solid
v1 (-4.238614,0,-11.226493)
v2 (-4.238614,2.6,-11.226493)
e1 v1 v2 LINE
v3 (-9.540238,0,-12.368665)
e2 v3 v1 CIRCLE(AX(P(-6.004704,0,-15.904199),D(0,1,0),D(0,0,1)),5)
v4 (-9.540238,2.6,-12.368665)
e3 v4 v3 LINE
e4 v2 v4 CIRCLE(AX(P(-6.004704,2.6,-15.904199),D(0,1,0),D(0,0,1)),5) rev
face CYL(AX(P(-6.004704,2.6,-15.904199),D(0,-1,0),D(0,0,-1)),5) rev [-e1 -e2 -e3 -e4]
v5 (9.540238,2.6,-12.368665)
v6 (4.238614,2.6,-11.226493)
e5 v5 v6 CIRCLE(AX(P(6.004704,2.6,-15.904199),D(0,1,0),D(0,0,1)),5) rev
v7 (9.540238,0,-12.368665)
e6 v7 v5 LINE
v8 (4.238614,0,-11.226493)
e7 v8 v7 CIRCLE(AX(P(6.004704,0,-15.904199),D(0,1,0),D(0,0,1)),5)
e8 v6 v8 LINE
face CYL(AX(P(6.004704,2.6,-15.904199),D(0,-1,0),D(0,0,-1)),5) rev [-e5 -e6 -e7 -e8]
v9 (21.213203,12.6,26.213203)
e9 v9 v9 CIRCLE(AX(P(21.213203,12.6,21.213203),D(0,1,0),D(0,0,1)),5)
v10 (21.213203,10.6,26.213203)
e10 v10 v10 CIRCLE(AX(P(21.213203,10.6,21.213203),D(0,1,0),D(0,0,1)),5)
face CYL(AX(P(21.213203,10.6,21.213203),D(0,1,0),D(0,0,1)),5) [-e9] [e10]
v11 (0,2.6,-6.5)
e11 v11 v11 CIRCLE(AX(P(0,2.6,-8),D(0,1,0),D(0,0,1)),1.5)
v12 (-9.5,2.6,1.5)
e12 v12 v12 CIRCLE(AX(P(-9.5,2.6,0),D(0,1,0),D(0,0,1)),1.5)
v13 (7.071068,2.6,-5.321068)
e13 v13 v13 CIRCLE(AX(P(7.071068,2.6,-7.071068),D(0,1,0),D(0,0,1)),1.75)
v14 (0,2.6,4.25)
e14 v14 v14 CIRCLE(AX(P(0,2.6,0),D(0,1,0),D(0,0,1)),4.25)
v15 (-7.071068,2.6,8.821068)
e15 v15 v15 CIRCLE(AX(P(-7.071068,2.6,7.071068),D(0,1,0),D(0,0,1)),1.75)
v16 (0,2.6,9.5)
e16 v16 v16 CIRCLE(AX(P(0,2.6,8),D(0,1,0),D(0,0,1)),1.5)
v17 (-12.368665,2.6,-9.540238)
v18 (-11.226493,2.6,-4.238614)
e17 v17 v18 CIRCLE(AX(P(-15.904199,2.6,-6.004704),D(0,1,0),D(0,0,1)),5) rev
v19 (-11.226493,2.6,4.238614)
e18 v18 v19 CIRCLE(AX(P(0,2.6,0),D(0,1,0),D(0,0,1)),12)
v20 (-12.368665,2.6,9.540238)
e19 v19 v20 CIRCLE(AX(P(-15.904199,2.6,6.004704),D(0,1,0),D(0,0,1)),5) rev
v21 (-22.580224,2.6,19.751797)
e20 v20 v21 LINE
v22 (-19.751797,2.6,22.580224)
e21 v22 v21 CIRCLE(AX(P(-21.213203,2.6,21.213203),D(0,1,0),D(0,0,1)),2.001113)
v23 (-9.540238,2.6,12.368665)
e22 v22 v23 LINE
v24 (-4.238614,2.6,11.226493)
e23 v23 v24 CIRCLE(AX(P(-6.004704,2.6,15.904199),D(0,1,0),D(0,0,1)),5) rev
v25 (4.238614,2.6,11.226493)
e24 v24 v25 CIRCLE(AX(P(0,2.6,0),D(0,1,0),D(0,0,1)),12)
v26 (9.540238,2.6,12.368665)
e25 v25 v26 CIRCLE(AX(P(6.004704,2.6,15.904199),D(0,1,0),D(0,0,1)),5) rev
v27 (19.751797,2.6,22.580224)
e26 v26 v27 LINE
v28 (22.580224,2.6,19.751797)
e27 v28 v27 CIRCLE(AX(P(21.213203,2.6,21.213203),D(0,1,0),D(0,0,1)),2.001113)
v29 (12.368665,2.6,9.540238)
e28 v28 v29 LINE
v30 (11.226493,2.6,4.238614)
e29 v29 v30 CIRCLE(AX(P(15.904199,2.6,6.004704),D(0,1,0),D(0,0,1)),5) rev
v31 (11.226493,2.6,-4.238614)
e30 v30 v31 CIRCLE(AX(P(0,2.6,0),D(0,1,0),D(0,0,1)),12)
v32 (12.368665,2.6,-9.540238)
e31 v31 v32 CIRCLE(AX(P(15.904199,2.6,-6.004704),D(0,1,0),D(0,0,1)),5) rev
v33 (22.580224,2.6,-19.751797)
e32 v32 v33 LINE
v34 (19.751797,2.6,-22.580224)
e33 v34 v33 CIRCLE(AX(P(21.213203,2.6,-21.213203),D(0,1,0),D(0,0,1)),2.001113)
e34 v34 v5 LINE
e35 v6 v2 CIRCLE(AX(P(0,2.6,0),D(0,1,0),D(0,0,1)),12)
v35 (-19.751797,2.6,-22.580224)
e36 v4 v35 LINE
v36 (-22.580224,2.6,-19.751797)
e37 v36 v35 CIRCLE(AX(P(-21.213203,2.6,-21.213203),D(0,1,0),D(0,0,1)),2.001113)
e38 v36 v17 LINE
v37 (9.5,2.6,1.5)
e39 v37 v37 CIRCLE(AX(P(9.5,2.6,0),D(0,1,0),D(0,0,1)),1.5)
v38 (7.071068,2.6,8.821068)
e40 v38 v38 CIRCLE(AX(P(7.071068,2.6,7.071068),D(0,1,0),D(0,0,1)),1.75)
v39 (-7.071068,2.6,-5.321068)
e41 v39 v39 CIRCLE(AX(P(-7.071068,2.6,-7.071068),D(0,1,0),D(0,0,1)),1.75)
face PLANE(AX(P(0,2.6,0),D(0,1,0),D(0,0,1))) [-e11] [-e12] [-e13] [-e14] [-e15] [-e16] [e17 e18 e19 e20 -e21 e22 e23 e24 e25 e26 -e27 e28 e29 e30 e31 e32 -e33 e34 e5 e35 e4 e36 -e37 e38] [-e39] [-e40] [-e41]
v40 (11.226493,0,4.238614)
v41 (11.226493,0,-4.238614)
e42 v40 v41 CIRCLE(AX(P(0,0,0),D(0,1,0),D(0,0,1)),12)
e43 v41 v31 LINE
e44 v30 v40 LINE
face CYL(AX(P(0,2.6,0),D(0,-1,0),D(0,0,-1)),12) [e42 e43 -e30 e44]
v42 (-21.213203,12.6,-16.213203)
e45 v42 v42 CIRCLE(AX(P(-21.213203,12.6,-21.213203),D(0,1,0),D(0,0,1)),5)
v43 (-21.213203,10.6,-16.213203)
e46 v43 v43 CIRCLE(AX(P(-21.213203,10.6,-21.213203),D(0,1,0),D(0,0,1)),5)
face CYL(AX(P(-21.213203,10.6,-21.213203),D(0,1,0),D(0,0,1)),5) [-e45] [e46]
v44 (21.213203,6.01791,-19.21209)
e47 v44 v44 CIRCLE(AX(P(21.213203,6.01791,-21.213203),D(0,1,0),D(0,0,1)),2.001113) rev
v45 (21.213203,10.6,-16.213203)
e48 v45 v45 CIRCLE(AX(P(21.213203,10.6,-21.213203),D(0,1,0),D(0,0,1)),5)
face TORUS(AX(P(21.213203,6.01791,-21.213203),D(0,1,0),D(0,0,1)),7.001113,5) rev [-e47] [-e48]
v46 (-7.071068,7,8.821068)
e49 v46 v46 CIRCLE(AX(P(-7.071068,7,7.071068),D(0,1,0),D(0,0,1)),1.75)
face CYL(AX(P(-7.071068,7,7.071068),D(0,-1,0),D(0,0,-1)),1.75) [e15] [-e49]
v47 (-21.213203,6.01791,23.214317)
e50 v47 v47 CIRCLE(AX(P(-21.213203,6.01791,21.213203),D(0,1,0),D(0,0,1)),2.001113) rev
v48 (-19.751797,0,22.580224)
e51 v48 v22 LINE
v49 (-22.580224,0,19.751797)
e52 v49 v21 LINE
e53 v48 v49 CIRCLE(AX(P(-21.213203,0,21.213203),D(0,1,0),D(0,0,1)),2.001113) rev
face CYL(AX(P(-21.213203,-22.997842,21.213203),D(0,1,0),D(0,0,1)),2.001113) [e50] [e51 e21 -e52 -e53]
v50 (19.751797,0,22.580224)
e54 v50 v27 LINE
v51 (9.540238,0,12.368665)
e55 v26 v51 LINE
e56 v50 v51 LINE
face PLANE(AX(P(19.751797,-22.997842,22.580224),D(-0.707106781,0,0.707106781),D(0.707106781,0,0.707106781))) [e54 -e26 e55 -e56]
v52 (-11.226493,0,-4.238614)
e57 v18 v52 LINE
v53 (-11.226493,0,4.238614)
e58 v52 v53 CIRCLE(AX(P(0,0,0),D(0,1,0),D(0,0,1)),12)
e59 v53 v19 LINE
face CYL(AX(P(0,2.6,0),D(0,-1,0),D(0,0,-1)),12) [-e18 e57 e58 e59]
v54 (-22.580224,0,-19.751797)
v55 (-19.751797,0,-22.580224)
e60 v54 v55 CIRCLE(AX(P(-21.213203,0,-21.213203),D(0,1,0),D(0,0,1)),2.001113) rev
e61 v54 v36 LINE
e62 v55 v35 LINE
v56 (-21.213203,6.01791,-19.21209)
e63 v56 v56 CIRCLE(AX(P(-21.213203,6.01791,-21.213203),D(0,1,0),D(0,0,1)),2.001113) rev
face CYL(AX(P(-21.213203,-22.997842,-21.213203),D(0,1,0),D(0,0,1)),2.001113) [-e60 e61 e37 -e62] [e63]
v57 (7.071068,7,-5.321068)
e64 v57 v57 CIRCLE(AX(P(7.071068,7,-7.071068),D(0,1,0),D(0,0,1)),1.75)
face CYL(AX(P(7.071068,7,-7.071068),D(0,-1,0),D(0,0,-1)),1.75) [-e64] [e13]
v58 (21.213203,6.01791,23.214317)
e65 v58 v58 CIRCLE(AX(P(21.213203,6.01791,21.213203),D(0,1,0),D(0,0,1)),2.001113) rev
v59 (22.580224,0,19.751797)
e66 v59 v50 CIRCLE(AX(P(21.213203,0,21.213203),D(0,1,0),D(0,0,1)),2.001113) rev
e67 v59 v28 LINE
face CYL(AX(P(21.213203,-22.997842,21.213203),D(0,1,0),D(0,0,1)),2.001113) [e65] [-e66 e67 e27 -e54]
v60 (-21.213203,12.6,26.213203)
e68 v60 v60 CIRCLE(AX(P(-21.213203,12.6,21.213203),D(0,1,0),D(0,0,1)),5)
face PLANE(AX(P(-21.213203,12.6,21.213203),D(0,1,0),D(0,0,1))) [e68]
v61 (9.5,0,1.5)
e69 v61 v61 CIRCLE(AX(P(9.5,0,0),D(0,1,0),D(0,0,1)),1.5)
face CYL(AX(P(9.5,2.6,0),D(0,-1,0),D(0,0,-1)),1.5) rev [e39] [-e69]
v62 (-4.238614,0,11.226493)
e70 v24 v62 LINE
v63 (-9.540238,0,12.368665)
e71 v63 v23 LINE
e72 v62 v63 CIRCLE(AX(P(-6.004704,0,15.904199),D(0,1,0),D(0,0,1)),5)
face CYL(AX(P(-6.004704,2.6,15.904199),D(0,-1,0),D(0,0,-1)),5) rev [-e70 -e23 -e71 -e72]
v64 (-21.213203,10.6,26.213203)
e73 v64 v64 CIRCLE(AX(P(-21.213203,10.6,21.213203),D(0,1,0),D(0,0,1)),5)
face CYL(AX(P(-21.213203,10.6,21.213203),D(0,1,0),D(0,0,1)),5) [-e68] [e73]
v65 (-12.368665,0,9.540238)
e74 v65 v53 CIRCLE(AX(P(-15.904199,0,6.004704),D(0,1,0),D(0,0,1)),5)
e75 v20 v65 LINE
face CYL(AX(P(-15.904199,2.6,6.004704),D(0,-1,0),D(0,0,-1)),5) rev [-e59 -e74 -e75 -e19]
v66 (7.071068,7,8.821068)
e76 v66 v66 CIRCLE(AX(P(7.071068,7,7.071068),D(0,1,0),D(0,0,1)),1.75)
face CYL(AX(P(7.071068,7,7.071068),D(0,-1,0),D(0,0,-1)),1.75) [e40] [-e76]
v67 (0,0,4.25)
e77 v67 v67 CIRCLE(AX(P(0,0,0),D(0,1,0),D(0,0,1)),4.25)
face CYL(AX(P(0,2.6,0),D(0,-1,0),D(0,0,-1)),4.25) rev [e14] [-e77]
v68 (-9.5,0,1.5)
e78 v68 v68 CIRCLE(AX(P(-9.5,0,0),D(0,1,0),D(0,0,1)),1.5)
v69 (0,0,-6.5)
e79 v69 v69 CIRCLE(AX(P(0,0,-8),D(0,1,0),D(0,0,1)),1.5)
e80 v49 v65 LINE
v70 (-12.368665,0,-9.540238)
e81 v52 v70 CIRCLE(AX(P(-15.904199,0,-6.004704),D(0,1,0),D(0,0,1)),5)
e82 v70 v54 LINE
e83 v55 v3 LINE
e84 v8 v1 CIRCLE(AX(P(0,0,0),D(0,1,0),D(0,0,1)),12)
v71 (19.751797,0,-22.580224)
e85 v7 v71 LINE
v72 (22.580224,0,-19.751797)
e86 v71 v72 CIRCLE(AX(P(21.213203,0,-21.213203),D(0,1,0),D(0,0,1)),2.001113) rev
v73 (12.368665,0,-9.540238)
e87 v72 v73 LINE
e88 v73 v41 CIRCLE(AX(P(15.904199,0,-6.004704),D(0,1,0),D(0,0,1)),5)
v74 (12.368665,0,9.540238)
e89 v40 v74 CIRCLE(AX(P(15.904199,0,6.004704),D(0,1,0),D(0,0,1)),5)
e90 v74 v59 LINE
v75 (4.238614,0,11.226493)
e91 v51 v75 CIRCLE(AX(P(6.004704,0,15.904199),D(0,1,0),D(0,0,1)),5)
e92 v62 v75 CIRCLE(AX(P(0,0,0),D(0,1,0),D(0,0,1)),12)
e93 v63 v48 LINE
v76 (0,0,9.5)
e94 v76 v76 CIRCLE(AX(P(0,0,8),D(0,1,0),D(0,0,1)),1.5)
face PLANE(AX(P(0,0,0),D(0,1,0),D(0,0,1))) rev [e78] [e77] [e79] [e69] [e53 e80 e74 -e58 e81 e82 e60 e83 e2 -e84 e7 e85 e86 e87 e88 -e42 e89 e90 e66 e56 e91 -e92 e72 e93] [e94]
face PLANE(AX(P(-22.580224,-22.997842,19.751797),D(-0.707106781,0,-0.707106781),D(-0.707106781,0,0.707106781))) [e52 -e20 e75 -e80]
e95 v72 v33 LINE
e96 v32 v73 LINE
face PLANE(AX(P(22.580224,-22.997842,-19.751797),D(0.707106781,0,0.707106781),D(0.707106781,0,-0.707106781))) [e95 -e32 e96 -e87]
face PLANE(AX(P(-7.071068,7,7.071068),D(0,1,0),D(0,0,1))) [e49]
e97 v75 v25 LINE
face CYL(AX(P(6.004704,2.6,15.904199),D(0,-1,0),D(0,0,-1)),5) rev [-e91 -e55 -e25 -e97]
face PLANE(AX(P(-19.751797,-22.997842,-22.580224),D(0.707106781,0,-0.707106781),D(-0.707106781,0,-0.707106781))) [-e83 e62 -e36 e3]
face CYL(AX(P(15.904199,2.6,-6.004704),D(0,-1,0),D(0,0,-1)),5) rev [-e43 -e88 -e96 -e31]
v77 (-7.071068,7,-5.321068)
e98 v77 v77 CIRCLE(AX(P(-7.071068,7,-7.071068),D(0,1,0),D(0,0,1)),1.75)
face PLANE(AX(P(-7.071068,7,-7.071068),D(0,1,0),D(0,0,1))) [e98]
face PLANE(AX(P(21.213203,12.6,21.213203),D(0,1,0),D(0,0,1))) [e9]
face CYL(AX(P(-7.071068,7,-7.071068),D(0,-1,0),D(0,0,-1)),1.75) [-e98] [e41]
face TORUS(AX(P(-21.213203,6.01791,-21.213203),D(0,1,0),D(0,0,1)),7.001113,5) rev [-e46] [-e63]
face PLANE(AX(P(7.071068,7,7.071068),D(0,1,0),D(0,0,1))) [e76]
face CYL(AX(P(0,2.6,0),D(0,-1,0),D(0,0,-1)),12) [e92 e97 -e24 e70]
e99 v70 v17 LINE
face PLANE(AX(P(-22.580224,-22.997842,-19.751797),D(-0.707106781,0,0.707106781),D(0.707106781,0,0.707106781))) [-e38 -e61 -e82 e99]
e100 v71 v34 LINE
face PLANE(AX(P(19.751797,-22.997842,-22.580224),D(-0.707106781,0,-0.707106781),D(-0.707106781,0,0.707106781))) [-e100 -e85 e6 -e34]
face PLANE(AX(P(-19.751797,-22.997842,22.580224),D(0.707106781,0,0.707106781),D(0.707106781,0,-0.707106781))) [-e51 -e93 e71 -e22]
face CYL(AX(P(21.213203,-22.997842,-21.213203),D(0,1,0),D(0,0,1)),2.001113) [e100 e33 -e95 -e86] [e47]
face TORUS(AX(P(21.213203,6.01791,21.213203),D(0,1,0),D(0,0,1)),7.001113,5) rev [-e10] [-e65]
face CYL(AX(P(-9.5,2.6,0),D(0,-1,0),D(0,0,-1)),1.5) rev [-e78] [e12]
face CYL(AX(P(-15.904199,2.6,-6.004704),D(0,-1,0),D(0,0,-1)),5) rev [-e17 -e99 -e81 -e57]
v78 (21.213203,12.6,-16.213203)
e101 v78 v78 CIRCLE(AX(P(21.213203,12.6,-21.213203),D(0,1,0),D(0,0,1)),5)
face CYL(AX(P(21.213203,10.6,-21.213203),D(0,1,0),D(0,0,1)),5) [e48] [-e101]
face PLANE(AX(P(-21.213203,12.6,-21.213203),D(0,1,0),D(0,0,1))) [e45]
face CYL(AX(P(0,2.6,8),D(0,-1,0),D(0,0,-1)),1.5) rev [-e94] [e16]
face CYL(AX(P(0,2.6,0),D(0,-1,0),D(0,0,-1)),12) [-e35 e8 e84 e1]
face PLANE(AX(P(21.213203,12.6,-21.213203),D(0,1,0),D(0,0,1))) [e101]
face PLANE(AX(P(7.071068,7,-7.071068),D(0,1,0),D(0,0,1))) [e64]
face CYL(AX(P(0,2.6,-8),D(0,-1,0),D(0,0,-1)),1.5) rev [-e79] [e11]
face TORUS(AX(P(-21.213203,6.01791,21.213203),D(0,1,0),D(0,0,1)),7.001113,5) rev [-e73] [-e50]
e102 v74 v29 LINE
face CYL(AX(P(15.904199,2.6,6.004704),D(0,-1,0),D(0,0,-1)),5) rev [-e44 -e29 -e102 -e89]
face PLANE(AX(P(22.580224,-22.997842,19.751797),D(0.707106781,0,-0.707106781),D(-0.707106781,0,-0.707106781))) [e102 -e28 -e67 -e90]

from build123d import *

# Parameters (mm, degrees)
SKETCH1_R           = 12
SKETCH1_R_2         = 1.5
SKETCH1_R_3         = 4.25
BOSS_EXTRUDE1_DEPTH = 2.6
SKETCH2_R           = 1.75
BOSS_EXTRUDE2_DEPTH = 4.4
BOSS_EXTRUDE3_DEPTH = 2.6
BOSS_EXTRUDE4_START = 10
SKETCH5_R           = 2.001113277
BOSS_EXTRUDE4_DEPTH = 10
SKETCH6_R           = 5
BOSS_EXTRUDE5_DEPTH = 2
FILLET1_R           = 5


with BuildPart() as part:
    # Sketch1 → Boss-Extrude1 (new body)
    with BuildSketch(Plane(origin=(0, 0, 0), x_dir=(1, 0, 0), z_dir=(0, 1, 0))):
        with Locations(Location((0, 0, 0), (0, 0, 270))):
            Circle(SKETCH1_R)
        with Locations(Location((0, 8, 0), (0, 0, 270))):
            Circle(SKETCH1_R_2, mode=Mode.SUBTRACT)
        with Locations(Location((9.5, 0, 0), (0, 0, 270))):
            Circle(SKETCH1_R_2, mode=Mode.SUBTRACT)
        with Locations(Location((0, -8, 0), (0, 0, 270))):
            Circle(SKETCH1_R_2, mode=Mode.SUBTRACT)
        with Locations(Location((-9.5, 0, 0), (0, 0, 270))):
            Circle(SKETCH1_R_2, mode=Mode.SUBTRACT)
        with Locations(Location((0, 0, 0), (0, 0, 270))):
            Circle(SKETCH1_R_3, mode=Mode.SUBTRACT)
    extrude(amount=BOSS_EXTRUDE1_DEPTH)

    # Sketch2 → Boss-Extrude2 (add)
    with BuildSketch(Plane(origin=(0, 2.6, 0), x_dir=(1, 0, 0), z_dir=(0, 1, 0))):
        with Locations(Location((-7.071067812, 7.071067812, 0), (0, 0, 270))):
            Circle(SKETCH2_R)
        with Locations(Location((7.071067812, 7.071067812, 0), (0, 0, 270))):
            Circle(SKETCH2_R)
        with Locations(Location((7.071067812, -7.071067812, 0), (0, 0, 270))):
            Circle(SKETCH2_R)
        with Locations(Location((-7.071067812, -7.071067812, 0), (0, 0, 270))):
            Circle(SKETCH2_R)
    extrude(amount=BOSS_EXTRUDE2_DEPTH)

    # Sketch3 → Boss-Extrude3 (add)
    with BuildSketch(Plane(origin=(0, 2.6, 0), x_dir=(1, 0, 0), z_dir=(0, 1, 0))):
        with BuildLine():
            Line((-22.580224051, 19.751796926), (-9.780813828, 6.952386703))
            ThreePointArc((-9.780813828, 6.952386703), (-8.455336604, 8.455336604), (-6.952386703, 9.780813828))
            Line((-6.952386703, 9.780813828), (-19.751796926, 22.580224051))
            ThreePointArc((-19.751796926, 22.580224051), (-22.628204204, 22.628204204), (-22.580224051, 19.751796926))
        make_face()
        with BuildLine():
            Line((19.751796926, 22.580224051), (6.952386703, 9.780813828))
            ThreePointArc((6.952386703, 9.780813828), (8.455336604, 8.455336604), (9.780813828, 6.952386703))
            Line((9.780813828, 6.952386703), (22.580224051, 19.751796926))
            ThreePointArc((22.580224051, 19.751796926), (22.628204204, 22.628204204), (19.751796926, 22.580224051))
        make_face()
        with BuildLine():
            Line((22.580224051, -19.751796926), (9.780813828, -6.952386703))
            ThreePointArc((9.780813828, -6.952386703), (8.455336604, -8.455336604), (6.952386703, -9.780813828))
            Line((6.952386703, -9.780813828), (19.751796926, -22.580224051))
            ThreePointArc((19.751796926, -22.580224051), (22.628204204, -22.628204204), (22.580224051, -19.751796926))
        make_face()
        with BuildLine():
            Line((-19.751796926, -22.580224051), (-6.952386703, -9.780813828))
            ThreePointArc((-6.952386703, -9.780813828), (-8.455336604, -8.455336604), (-9.780813828, -6.952386703))
            Line((-9.780813828, -6.952386703), (-22.580224051, -19.751796926))
            ThreePointArc((-22.580224051, -19.751796926), (-22.628204204, -22.628204204), (-19.751796926, -22.580224051))
        make_face()
    extrude(amount=-BOSS_EXTRUDE3_DEPTH)

    # Sketch5 → Boss-Extrude4 (add)
    with BuildSketch(Plane(origin=(0, 2.6, 0), x_dir=(1, 0, 0), z_dir=(0, 1, 0)).offset(BOSS_EXTRUDE4_START)):
        with Locations(Location((-21.213203436, 21.213203436, 0), (0, 0, 270))):
            Circle(SKETCH5_R)
        with Locations(Location((21.213203436, 21.213203436, 0), (0, 0, 270))):
            Circle(SKETCH5_R)
        with Locations(Location((21.213203436, -21.213203436, 0), (0, 0, 270))):
            Circle(SKETCH5_R)
        with Locations(Location((-21.213203436, -21.213203436, 0), (0, 0, 270))):
            Circle(SKETCH5_R)
    extrude(amount=-BOSS_EXTRUDE4_DEPTH)

    # Sketch6 → Boss-Extrude5 (add)
    with BuildSketch(Plane(origin=(0, 12.6, 0), x_dir=(1, 0, 0), z_dir=(0, 1, 0))):
        with Locations(Location((21.213203436, -21.213203436, 0), (0, 0, 270))):
            Circle(SKETCH6_R)
        with Locations(Location((21.213203436, 21.213203436, 0), (0, 0, 270))):
            Circle(SKETCH6_R)
        with Locations(Location((-21.213203436, 21.213203436, 0), (0, 0, 270))):
            Circle(SKETCH6_R)
        with Locations(Location((-21.213203436, -21.213203436, 0), (0, 0, 270))):
            Circle(SKETCH6_R)
    extrude(amount=-BOSS_EXTRUDE5_DEPTH)

    # Fillet1
    fillet1_edges = [part.edges().sort_by_distance(p)[0] for p in [
        (-6.952386703, 1.3, -9.780813828),
        (-9.780813828, 1.3, -6.952386703),
        (9.780813828, 1.3, -6.952386703),
        (6.952386703, 1.3, -9.780813828),
        (6.952386703, 1.3, 9.780813828),
        (9.780813828, 1.3, 6.952386703),
        (-9.780813828, 1.3, 6.952386703),
        (-6.952386703, 1.3, 9.780813828),
    ]]
    fillet(fillet1_edges, radius=FILLET1_R)

    # Fillet2: read off the stored shape, not the designer's step
    # Fillet2 outline → Fillet2 (revolve)
    with BuildSketch(Plane(origin=(-21.213203436, 0, 21.213203436), x_dir=(1, 0, 0), z_dir=(0, 0, 1))):
        with BuildLine():
            ThreePointArc((2.001113277, 6.01791034), (2.817480503, 8.756014941), (5, 10.6))
            Line((5, 10.6), (2.001113277, 10.6))
            Line((2.001113277, 10.6), (2.001113277, 6.01791034))
        make_face()
    revolve(axis=Axis((-21.213203436, 0, 21.213203436), (0, 1, 0)))

    # Fillet2 2 outline → Fillet2 2 (revolve)
    with BuildSketch(Plane(origin=(21.213203436, 0, 21.213203436), x_dir=(1, 0, 0), z_dir=(0, 0, 1))):
        with BuildLine():
            ThreePointArc((2.001113277, 6.01791034), (2.817480503, 8.756014941), (5, 10.6))
            Line((5, 10.6), (2.001113277, 10.6))
            Line((2.001113277, 10.6), (2.001113277, 6.01791034))
        make_face()
    revolve(axis=Axis((21.213203436, 0, 21.213203436), (0, 1, 0)))

    # Fillet2 3 outline → Fillet2 3 (revolve)
    with BuildSketch(Plane(origin=(21.213203436, 0, -21.213203436), x_dir=(1, 0, 0), z_dir=(0, 0, 1))):
        with BuildLine():
            ThreePointArc((2.001113277, 6.01791034), (2.817480503, 8.756014941), (5, 10.6))
            Line((5, 10.6), (2.001113277, 10.6))
            Line((2.001113277, 10.6), (2.001113277, 6.01791034))
        make_face()
    revolve(axis=Axis((21.213203436, 0, -21.213203436), (0, 1, 0)))

    # Fillet2 4 outline → Fillet2 4 (revolve)
    with BuildSketch(Plane(origin=(-21.213203436, 0, -21.213203436), x_dir=(1, 0, 0), z_dir=(0, 0, 1))):
        with BuildLine():
            ThreePointArc((2.001113277, 6.01791034), (2.817480503, 8.756014941), (5, 10.6))
            Line((5, 10.6), (2.001113277, 10.6))
            Line((2.001113277, 10.6), (2.001113277, 6.01791034))
        make_face()
    revolve(axis=Axis((-21.213203436, 0, -21.213203436), (0, 1, 0)))


solid = part.part
